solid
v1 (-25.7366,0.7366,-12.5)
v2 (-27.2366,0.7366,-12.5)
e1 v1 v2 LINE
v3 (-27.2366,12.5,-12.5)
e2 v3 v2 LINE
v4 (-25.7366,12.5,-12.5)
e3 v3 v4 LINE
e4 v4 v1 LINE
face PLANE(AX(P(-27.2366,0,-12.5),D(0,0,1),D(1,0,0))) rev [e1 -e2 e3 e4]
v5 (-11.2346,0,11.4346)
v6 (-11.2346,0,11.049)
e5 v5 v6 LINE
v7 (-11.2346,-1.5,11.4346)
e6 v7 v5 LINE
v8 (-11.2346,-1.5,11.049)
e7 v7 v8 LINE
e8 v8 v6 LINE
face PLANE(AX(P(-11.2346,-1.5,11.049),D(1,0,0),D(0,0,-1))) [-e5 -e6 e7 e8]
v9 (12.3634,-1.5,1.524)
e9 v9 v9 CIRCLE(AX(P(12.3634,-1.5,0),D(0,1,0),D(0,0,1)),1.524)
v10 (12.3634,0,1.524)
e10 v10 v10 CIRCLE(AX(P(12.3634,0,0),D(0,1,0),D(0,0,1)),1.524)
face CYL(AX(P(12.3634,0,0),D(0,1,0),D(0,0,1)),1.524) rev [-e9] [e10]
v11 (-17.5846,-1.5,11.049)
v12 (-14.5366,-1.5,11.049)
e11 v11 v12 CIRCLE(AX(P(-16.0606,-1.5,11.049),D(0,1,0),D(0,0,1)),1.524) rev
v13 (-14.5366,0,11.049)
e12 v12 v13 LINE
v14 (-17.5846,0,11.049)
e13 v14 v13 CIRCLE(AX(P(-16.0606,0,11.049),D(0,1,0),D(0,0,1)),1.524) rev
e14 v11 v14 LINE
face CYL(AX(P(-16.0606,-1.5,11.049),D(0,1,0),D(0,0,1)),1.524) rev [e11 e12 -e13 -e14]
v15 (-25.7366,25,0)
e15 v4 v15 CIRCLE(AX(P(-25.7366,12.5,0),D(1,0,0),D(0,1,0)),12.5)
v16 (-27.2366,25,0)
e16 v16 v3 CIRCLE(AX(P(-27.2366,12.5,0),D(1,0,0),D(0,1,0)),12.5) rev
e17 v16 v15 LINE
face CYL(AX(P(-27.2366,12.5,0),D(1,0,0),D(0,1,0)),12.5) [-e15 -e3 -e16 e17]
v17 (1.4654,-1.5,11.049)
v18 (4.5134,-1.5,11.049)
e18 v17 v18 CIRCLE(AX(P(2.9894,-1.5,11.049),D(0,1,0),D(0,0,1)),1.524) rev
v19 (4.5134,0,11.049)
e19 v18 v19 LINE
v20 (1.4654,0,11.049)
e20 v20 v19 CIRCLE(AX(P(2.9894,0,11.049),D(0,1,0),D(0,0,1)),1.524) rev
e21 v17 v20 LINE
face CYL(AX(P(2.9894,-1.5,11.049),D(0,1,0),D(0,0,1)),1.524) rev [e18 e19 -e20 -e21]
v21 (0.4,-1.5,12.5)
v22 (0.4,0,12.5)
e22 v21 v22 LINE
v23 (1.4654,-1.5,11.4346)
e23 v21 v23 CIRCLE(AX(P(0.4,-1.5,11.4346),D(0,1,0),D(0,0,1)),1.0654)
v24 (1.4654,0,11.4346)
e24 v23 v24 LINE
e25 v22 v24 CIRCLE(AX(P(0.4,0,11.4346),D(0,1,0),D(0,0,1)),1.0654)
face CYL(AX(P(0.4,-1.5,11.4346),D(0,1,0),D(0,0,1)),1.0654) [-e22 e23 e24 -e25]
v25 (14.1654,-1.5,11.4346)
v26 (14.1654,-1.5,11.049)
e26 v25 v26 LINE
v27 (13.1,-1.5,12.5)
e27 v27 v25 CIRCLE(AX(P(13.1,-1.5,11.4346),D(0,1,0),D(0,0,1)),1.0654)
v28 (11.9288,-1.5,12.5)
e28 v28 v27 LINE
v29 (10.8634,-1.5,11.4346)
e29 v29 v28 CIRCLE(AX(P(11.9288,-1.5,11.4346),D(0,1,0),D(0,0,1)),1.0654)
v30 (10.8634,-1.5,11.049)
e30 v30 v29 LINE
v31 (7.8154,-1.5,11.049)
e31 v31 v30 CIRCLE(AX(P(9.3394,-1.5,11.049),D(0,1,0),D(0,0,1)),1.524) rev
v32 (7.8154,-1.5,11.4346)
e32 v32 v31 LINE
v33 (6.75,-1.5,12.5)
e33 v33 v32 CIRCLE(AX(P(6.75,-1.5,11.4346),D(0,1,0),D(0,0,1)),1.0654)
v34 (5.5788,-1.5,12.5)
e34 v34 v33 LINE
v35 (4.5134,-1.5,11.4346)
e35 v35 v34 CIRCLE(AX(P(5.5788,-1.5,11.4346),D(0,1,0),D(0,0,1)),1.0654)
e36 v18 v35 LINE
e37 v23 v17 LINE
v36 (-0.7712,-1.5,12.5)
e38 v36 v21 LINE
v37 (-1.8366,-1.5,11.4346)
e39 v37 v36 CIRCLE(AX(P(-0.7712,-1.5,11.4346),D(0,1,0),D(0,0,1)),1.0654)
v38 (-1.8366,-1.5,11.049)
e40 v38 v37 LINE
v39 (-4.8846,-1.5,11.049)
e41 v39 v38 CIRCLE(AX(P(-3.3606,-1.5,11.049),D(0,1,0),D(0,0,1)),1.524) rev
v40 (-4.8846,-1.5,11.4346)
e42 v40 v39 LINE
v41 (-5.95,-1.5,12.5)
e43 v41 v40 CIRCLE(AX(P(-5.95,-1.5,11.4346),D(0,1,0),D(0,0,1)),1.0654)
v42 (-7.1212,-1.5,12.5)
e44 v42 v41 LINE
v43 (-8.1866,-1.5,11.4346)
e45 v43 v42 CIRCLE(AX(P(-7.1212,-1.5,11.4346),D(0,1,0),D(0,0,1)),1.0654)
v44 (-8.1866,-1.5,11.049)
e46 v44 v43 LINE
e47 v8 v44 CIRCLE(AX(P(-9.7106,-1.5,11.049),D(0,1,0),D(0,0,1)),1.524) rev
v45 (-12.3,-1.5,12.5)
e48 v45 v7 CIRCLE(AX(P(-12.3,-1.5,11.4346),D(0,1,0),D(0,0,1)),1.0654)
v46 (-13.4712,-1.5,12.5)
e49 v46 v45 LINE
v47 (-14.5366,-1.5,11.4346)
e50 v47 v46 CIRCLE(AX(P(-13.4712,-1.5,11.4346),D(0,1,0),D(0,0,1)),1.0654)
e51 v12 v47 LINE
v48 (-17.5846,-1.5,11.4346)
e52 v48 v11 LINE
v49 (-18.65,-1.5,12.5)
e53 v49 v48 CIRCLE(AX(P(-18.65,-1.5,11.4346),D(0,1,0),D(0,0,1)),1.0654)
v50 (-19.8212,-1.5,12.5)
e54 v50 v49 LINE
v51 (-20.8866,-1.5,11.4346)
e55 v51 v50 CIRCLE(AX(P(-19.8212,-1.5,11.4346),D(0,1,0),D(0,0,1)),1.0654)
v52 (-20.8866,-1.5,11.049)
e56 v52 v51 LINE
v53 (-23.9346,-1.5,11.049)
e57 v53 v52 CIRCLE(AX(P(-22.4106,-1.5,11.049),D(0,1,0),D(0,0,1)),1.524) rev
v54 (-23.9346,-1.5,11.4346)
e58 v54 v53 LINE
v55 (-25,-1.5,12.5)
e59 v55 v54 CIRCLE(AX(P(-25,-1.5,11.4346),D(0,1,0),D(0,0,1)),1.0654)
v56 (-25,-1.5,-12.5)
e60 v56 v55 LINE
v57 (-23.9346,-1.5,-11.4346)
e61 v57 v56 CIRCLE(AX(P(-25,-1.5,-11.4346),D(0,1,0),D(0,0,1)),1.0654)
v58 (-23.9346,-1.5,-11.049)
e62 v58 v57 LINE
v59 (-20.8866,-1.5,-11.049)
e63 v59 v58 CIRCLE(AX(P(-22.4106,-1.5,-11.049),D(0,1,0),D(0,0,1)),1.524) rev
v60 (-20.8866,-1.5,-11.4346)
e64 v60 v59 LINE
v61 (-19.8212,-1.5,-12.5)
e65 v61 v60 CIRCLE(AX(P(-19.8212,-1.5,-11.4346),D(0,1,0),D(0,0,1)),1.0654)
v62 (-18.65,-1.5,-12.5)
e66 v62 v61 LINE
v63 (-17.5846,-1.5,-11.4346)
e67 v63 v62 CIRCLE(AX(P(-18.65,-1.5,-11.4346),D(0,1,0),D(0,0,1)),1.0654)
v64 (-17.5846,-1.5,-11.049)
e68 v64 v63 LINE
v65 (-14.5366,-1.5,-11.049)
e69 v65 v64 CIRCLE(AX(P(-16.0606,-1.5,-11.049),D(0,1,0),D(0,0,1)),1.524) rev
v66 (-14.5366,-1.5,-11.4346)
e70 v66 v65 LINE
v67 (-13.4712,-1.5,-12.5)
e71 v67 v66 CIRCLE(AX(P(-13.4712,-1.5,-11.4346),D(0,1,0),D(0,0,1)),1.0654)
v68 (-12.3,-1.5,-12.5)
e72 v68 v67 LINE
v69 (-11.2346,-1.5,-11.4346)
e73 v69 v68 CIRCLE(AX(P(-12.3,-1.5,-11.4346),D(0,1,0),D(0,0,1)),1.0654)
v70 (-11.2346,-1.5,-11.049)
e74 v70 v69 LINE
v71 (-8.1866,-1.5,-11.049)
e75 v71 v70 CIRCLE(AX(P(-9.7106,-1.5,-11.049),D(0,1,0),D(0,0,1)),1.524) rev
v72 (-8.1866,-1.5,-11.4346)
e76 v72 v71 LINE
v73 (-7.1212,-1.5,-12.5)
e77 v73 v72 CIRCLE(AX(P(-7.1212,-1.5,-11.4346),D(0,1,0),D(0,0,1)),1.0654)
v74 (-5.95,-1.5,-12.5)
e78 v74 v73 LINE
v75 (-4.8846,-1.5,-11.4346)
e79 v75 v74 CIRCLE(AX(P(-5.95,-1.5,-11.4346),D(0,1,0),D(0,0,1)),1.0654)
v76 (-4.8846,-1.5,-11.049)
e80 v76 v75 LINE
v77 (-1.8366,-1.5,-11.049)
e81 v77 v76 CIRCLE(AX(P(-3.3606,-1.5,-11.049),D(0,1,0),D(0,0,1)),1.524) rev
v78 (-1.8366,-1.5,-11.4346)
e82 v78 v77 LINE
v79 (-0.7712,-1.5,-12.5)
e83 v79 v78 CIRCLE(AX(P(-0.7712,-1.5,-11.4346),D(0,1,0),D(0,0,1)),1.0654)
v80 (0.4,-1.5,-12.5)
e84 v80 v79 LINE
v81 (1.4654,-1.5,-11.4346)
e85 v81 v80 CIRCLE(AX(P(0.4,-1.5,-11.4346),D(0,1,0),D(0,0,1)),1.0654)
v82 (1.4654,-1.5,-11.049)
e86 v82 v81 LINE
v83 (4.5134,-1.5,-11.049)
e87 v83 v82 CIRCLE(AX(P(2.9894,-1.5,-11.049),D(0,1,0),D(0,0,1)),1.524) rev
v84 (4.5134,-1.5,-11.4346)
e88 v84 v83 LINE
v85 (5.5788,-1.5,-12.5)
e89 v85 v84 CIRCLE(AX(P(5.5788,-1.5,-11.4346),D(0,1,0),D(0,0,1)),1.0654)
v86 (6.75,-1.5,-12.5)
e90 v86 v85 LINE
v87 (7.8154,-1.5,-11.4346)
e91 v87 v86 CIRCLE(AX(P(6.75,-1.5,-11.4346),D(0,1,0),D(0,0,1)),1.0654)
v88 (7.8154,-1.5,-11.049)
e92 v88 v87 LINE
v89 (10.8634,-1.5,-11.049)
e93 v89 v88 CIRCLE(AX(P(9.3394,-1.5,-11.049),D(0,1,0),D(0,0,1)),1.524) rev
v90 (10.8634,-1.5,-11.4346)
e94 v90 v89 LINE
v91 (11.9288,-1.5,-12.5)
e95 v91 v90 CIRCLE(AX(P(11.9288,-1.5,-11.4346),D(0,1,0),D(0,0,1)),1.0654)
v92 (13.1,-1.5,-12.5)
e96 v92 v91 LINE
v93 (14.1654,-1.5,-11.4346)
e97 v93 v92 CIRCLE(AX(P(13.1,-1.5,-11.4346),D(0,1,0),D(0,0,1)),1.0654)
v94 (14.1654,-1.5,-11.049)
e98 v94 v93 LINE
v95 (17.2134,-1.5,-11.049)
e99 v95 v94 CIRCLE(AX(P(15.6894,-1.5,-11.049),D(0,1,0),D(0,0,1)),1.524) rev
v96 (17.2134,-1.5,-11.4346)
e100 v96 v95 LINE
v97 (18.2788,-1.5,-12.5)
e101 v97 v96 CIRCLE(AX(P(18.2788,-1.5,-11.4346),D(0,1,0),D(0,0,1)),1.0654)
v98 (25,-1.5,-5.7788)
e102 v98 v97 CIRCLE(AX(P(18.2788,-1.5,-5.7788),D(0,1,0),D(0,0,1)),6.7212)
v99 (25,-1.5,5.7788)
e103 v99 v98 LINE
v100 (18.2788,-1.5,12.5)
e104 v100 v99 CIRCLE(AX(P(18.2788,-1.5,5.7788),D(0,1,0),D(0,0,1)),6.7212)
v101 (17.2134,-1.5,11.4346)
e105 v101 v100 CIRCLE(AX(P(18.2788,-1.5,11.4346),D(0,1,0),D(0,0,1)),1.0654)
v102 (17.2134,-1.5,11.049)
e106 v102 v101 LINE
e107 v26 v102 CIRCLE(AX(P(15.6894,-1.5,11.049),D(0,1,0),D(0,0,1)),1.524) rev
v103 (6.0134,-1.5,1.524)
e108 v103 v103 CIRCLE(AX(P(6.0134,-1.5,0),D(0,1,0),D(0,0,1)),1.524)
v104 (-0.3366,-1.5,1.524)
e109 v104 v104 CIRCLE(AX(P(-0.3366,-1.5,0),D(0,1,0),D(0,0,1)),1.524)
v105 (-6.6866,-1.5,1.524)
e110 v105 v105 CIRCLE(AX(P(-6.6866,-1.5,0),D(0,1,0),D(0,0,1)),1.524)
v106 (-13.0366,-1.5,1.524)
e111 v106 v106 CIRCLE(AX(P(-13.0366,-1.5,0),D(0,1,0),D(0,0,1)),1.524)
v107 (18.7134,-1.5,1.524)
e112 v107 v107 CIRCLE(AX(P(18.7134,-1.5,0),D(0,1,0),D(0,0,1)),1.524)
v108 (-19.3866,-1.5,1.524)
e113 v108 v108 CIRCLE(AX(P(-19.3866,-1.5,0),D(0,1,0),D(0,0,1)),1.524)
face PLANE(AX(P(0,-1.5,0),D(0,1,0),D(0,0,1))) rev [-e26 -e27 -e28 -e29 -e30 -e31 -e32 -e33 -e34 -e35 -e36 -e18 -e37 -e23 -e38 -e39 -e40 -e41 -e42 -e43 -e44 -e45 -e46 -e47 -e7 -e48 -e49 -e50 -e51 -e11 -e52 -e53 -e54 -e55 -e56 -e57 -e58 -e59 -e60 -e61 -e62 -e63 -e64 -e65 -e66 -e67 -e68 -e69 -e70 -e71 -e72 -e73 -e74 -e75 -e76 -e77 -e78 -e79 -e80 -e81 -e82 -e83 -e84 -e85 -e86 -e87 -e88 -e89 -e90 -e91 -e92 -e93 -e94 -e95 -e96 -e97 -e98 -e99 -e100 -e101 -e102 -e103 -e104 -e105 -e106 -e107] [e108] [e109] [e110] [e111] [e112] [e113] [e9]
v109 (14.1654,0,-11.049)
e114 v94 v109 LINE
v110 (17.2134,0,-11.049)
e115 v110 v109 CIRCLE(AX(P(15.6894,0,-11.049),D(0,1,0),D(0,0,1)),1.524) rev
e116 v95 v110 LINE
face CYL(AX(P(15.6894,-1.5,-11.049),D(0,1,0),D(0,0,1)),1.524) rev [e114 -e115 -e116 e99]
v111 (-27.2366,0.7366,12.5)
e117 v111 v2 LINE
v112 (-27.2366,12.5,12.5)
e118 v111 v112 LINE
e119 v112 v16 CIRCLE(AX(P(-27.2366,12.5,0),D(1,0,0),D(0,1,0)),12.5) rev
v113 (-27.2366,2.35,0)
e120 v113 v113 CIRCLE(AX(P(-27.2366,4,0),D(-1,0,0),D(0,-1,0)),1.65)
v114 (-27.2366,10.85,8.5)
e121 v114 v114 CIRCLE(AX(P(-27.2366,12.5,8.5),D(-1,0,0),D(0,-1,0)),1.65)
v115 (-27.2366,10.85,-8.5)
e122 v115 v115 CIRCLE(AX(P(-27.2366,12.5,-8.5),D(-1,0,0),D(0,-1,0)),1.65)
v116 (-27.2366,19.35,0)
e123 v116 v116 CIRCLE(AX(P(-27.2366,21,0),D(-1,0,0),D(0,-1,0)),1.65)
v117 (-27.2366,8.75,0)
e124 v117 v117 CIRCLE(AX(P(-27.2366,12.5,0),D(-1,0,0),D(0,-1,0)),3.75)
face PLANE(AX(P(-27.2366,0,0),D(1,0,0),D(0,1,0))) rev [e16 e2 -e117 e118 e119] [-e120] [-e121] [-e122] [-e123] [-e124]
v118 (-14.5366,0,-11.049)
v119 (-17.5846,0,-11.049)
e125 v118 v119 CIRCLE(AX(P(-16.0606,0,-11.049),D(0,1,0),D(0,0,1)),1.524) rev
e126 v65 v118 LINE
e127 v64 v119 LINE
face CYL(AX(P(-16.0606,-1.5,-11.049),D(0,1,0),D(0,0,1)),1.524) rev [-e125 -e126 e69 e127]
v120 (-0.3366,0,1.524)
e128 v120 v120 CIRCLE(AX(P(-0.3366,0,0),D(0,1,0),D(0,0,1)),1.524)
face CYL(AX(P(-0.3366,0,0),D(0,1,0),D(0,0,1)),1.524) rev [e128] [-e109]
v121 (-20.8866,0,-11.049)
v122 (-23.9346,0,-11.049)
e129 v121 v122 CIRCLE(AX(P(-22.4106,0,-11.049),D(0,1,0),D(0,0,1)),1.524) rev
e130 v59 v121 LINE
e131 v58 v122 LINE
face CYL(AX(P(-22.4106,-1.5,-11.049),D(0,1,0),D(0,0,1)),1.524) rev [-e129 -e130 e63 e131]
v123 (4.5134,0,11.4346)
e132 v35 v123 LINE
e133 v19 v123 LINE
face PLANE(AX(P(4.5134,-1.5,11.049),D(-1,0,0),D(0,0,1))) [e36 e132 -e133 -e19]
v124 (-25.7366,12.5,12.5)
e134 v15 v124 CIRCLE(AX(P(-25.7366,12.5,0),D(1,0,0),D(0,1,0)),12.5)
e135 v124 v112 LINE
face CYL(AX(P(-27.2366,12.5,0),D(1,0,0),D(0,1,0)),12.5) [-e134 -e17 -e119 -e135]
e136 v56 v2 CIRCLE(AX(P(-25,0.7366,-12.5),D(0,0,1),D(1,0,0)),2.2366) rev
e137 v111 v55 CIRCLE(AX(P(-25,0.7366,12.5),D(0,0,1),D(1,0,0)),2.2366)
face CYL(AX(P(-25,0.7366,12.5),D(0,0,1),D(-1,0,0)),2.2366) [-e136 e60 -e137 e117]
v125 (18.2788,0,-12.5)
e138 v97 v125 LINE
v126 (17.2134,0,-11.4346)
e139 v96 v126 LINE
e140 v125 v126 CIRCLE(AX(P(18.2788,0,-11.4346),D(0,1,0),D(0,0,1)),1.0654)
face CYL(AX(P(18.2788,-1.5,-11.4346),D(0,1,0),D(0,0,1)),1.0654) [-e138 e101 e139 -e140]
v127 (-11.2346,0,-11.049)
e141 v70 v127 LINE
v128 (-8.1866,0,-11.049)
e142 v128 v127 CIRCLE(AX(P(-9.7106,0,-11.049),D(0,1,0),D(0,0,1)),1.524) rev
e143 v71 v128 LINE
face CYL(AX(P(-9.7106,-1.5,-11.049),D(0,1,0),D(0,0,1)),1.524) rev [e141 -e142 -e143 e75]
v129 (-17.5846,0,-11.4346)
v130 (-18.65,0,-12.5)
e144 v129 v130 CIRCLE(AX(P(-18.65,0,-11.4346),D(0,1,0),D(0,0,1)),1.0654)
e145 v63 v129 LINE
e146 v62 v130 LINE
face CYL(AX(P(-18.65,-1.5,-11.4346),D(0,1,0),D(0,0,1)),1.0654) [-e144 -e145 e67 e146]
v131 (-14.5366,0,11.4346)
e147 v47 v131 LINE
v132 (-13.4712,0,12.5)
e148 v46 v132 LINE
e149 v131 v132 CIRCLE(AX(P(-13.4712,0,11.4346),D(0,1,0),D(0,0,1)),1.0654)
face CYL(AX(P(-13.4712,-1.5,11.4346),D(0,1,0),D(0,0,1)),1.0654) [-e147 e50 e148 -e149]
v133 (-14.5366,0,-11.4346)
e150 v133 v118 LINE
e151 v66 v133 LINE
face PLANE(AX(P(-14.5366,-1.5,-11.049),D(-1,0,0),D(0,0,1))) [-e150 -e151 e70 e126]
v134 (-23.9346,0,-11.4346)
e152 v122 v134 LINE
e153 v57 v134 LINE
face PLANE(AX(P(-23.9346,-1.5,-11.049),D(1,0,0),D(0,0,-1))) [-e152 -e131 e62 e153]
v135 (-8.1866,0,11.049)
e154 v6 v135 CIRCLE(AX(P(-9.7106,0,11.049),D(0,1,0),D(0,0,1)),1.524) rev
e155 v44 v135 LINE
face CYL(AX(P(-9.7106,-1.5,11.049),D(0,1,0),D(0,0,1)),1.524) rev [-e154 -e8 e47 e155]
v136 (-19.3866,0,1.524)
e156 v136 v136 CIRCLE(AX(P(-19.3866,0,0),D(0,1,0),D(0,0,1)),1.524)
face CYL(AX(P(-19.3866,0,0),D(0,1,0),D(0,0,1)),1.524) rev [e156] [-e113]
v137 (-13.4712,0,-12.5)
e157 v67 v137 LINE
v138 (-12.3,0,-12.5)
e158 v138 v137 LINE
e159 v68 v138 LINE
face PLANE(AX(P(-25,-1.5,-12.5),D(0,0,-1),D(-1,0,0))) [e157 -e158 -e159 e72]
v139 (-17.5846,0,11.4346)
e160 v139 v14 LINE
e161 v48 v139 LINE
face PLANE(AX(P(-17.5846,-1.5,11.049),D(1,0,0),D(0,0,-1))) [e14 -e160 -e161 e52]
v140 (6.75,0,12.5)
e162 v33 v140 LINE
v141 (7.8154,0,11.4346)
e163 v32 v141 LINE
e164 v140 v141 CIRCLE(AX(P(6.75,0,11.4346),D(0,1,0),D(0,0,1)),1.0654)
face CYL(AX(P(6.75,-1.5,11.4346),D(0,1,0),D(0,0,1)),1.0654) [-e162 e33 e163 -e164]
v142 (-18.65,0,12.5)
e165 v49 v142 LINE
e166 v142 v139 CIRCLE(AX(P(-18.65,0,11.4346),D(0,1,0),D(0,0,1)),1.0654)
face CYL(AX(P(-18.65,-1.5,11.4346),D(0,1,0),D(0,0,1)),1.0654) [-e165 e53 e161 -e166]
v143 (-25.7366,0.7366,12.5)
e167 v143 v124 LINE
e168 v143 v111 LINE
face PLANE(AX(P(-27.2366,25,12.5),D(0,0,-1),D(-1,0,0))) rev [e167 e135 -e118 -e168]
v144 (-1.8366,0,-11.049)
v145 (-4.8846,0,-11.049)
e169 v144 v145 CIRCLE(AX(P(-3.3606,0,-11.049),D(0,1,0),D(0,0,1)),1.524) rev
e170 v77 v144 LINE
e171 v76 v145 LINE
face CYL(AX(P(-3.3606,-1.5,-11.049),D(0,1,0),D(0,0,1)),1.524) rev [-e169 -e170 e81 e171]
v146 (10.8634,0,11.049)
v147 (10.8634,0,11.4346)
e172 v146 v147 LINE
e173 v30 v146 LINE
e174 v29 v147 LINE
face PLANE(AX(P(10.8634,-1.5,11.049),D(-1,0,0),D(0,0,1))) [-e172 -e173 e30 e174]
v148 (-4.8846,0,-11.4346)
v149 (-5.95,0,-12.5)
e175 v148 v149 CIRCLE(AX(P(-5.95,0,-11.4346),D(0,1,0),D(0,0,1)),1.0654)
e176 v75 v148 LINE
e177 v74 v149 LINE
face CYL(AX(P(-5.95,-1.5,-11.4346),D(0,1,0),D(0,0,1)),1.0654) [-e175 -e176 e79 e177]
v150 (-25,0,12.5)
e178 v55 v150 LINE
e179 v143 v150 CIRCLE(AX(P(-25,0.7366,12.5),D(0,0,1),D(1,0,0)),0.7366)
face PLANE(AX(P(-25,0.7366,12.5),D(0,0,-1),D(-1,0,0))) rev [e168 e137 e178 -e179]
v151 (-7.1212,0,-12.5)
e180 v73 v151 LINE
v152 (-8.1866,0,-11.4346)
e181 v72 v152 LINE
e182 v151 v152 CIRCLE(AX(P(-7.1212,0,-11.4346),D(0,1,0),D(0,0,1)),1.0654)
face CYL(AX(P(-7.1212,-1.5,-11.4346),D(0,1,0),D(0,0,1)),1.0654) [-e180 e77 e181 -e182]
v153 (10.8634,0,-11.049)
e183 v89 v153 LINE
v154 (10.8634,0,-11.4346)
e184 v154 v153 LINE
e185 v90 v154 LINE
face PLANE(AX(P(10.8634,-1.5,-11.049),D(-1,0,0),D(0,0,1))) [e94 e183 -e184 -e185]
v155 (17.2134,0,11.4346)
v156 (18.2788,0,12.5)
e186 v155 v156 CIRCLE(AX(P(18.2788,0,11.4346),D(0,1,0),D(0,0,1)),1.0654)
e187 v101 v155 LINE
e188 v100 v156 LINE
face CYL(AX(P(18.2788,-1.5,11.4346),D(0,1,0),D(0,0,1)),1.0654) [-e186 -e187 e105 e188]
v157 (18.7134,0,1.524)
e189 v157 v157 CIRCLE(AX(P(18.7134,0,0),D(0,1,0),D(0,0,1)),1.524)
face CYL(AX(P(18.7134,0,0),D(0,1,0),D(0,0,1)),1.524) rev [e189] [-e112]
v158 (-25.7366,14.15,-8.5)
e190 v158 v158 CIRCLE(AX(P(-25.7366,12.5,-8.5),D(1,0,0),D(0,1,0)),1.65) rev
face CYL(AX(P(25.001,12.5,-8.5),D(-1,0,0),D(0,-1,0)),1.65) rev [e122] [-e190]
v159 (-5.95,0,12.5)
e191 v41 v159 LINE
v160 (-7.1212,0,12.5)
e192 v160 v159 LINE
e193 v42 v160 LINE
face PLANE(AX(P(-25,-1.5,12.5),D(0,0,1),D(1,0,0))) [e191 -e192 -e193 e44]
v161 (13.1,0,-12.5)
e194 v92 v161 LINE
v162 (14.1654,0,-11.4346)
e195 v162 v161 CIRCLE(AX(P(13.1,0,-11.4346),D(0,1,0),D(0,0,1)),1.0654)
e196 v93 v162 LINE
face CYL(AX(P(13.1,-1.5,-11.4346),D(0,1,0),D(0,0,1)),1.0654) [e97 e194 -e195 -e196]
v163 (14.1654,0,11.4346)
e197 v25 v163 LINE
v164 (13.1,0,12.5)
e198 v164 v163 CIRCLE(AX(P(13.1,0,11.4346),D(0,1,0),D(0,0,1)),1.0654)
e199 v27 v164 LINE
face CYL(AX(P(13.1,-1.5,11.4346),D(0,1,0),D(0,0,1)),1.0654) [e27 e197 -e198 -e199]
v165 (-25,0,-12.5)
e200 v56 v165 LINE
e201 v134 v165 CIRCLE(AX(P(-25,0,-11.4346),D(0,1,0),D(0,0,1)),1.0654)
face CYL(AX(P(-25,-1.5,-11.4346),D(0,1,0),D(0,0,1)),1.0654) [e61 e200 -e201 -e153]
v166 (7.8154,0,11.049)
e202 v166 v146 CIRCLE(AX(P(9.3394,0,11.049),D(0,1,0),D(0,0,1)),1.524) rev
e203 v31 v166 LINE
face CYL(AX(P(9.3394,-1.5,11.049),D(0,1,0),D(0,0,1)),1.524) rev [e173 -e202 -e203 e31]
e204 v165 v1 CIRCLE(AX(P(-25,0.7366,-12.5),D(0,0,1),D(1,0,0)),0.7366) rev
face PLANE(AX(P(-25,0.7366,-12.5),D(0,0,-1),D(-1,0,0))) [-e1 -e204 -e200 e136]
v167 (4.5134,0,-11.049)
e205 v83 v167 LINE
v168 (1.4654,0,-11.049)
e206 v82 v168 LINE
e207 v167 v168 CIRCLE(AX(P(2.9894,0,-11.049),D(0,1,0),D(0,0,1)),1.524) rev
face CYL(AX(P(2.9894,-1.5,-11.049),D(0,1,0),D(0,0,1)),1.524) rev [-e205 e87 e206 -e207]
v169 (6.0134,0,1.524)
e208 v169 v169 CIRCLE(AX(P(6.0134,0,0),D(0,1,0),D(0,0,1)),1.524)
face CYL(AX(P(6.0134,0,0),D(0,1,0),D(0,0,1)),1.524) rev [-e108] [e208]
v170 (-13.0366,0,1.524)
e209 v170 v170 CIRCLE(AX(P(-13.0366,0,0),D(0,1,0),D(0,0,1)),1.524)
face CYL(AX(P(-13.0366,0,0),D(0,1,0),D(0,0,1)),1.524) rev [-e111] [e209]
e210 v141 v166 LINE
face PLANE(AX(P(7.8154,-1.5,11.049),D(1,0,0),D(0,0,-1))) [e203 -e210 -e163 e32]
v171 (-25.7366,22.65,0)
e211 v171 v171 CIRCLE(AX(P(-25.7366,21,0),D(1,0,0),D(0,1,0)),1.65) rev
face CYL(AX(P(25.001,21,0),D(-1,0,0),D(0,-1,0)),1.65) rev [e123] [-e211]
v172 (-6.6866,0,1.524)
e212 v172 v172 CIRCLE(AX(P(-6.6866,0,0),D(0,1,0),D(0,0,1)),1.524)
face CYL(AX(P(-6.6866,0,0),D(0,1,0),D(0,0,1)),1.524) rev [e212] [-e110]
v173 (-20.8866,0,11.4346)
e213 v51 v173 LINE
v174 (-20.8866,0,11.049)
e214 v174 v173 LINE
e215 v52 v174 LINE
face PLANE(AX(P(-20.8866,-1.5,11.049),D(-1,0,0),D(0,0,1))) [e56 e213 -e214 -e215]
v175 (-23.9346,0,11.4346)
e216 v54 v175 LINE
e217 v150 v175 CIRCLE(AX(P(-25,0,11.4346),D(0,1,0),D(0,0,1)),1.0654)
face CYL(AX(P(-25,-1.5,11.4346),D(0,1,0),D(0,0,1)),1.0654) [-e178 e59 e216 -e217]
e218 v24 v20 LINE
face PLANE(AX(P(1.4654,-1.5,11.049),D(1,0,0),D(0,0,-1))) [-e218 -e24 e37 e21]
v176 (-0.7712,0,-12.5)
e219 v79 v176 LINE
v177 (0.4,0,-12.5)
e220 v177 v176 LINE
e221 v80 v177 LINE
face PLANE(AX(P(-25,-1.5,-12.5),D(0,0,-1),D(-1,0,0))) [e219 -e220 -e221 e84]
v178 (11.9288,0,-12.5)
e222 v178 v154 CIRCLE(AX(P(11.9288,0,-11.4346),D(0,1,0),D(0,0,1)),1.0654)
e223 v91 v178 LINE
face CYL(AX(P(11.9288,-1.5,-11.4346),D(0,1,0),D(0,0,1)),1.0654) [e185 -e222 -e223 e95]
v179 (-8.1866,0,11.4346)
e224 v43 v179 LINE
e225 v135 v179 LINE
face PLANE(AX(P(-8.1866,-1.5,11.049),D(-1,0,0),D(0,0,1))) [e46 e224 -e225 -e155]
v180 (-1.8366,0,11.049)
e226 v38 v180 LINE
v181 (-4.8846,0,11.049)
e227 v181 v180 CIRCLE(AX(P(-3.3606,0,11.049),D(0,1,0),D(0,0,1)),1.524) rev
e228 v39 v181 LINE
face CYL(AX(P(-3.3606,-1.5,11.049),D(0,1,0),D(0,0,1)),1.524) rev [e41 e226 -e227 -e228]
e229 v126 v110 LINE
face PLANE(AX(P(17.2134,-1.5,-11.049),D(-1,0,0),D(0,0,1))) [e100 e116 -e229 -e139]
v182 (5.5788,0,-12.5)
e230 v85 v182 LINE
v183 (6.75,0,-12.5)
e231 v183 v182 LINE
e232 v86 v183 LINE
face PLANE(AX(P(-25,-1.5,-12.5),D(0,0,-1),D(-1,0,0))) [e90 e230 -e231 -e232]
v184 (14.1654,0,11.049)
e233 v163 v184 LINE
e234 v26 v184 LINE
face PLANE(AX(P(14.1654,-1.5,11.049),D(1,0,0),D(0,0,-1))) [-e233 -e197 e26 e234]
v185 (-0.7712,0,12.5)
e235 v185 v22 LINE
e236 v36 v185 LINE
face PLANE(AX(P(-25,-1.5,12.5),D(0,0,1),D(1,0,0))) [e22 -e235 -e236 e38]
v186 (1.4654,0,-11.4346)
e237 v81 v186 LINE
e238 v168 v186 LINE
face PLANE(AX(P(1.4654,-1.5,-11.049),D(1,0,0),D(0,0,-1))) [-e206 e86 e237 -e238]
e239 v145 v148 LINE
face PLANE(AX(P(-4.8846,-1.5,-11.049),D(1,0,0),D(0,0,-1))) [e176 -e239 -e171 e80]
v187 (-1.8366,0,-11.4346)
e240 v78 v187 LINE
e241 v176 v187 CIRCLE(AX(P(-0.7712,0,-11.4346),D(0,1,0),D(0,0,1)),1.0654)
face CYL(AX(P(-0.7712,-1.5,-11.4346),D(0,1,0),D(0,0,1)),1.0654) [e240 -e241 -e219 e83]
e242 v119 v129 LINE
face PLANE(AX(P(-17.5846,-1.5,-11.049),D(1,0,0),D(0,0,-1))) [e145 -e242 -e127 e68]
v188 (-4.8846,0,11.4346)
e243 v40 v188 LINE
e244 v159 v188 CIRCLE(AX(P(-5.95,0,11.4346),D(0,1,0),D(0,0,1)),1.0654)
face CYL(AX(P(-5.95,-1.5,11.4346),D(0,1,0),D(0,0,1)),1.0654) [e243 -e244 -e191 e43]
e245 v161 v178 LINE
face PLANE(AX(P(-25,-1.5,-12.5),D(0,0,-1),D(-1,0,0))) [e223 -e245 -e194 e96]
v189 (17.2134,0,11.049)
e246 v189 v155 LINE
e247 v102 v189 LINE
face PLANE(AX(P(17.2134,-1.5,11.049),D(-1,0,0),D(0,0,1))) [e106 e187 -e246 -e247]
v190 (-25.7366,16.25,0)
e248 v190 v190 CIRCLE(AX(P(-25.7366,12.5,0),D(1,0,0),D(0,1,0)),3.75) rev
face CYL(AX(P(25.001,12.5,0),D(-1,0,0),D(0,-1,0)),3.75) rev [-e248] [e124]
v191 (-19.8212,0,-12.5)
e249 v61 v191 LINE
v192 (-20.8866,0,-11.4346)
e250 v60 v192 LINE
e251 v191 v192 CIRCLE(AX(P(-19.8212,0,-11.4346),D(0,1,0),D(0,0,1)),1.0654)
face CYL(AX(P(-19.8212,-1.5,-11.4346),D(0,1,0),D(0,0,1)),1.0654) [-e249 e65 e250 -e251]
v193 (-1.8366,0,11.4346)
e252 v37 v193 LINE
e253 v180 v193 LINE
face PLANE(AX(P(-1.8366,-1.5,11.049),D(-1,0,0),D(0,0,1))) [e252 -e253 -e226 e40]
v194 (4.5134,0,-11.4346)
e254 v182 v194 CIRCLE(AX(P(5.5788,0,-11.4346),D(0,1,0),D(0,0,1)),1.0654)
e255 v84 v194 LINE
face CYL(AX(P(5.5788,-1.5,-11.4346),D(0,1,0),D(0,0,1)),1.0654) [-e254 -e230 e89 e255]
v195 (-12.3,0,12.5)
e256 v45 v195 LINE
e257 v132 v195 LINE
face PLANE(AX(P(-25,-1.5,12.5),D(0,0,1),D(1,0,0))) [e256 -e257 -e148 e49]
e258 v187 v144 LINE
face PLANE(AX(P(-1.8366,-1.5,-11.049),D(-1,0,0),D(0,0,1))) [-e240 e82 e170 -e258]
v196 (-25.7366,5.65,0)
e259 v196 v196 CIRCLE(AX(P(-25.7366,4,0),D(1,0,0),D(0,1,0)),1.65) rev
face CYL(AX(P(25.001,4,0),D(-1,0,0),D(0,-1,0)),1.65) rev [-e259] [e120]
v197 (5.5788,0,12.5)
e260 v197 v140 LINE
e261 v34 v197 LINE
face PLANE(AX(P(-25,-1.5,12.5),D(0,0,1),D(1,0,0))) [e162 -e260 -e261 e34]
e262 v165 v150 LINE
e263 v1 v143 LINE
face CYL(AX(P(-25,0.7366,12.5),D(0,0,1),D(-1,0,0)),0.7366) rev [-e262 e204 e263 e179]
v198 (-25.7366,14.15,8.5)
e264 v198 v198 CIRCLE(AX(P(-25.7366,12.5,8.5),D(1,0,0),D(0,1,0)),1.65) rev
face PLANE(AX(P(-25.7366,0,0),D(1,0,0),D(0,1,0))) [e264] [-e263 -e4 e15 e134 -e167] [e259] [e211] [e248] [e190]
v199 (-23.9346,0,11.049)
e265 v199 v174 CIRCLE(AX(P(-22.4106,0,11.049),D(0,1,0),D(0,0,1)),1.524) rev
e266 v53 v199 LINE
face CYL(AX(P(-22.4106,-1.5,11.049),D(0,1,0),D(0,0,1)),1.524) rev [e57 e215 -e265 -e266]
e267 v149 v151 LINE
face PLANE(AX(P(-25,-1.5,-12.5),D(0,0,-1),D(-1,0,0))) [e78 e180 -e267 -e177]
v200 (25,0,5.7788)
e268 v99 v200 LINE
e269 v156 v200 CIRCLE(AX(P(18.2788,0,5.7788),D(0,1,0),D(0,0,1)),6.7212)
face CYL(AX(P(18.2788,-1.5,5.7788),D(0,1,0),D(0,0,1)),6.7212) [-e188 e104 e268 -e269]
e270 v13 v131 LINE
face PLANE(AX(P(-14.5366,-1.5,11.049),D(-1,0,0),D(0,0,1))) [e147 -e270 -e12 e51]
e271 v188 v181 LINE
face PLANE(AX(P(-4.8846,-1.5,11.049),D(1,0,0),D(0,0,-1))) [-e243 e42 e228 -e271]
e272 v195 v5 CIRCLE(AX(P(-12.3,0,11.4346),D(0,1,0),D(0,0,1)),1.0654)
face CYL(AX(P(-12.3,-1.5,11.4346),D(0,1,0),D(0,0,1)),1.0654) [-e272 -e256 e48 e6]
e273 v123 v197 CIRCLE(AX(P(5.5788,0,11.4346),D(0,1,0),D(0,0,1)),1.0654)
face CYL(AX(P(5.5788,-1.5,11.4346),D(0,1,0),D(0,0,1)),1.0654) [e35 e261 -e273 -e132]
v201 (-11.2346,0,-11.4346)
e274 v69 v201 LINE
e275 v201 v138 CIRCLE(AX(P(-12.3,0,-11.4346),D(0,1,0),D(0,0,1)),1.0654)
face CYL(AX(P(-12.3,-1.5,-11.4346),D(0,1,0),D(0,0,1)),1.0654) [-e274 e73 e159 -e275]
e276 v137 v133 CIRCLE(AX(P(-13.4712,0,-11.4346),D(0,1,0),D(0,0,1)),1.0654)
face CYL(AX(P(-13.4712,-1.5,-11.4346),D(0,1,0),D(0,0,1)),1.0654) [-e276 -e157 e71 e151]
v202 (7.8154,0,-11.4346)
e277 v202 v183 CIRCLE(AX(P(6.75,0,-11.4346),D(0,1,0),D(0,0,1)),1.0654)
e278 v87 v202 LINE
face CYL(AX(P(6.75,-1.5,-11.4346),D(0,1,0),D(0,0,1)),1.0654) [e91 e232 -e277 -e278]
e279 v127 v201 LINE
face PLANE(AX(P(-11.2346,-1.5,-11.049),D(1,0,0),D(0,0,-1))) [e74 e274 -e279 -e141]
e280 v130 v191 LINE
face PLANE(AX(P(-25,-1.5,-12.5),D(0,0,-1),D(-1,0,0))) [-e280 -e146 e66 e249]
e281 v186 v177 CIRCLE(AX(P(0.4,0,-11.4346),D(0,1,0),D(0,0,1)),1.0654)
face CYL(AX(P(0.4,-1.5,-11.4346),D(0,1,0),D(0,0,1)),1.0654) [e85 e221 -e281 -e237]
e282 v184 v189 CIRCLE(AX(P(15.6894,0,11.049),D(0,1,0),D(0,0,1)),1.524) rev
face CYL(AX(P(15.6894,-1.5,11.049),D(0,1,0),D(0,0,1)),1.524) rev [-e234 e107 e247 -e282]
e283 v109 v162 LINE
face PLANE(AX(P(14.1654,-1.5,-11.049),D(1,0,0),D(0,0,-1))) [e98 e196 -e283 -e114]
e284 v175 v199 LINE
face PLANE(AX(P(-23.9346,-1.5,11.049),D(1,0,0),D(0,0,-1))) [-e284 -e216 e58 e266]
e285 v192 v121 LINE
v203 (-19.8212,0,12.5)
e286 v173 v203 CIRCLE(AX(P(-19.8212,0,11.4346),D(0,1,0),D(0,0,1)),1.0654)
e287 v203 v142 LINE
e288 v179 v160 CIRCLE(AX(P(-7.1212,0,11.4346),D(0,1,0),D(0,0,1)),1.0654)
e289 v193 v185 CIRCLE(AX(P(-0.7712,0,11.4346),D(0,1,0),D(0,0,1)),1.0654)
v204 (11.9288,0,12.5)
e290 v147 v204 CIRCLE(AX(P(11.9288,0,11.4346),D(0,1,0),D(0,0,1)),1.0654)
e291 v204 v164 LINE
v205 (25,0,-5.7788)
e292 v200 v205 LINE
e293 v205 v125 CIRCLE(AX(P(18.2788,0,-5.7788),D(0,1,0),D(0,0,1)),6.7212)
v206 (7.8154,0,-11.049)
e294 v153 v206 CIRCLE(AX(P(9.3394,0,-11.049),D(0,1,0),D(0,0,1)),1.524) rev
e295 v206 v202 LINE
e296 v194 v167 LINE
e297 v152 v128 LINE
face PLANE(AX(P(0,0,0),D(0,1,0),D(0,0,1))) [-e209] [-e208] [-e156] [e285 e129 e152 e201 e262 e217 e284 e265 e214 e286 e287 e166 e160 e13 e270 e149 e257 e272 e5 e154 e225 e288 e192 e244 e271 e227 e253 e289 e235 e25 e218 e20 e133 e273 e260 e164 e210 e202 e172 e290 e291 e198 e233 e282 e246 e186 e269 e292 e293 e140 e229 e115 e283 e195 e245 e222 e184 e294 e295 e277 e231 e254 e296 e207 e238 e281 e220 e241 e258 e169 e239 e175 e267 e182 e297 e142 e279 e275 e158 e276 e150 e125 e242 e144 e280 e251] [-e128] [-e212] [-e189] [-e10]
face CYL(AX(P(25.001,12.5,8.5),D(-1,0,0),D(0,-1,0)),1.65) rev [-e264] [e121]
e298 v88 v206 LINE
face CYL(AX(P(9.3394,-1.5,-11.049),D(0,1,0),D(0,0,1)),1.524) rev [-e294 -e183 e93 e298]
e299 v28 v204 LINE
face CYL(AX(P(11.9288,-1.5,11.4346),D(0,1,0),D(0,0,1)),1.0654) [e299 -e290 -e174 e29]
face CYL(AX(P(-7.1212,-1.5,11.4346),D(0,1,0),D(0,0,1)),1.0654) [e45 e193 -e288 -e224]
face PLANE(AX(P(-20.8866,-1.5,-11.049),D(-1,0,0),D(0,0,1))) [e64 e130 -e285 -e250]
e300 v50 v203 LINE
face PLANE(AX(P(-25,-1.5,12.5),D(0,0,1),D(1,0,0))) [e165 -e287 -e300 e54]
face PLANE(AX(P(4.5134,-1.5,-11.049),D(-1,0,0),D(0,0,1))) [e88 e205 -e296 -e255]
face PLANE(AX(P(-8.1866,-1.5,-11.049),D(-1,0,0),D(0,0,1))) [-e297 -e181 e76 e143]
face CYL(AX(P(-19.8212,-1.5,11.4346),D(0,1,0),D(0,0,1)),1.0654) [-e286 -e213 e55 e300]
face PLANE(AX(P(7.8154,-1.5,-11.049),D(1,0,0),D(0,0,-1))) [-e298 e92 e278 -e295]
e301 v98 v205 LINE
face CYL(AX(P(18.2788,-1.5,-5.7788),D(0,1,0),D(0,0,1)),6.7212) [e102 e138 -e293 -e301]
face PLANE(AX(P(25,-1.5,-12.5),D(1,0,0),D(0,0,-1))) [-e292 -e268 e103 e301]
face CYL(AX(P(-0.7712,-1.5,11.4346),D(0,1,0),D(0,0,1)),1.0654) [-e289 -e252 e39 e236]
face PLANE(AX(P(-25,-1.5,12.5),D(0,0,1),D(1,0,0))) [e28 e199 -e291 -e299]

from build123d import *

# Parameters (mm, degrees)
SKETCH1_W          = 50
SKETCH1_H          = 25
BASE_FLANGE1_DEPTH = 1.5
EDGE_FLANGE1_DEPTH = 25
FILLET1_R          = 12.5
CUT_EXTRUDE1_REACH = 61.245
SKETCH11_R         = 3.75
SKETCH11_R_2       = 1.65
CUT_EXTRUDE2_START = -1.5
SKETCH14_R         = 1.524
CUT_EXTRUDE2_DEPTH = 26.5


# Sheet-metal steps are written as plain solids
with BuildPart() as part:
    # Sketch1 → Base-Flange1 (new body)
    with BuildSketch(Plane(origin=(0, 0, 0), x_dir=(1, 0, 0), z_dir=(0, 1, 0))):
        Rectangle(SKETCH1_W, SKETCH1_H)
    extrude(amount=-BASE_FLANGE1_DEPTH)

    # Edge-Flange1 section (across the edge) → Edge-Flange1 (add)
    with BuildSketch(Plane(origin=(-25.7366, 0, -12.5), x_dir=(1, 0, 0), z_dir=(0, 0, 1))):
        with BuildLine():
            Line((-1.5, 0.7366), (-1.5, 25))
            Line((-1.5, 25), (0, 25))
            Line((0, 25), (0, 0.7366))
            ThreePointArc((0, 0.7366), (0.215745145, 0.215745145), (0.7366, 0))
            Line((0.7366, 0), (0.7366, -1.5))
            ThreePointArc((0.7366, -1.5), (-0.844915027, -0.844915027), (-1.5, 0.7366))
        make_face()
    extrude(amount=EDGE_FLANGE1_DEPTH)

    # Fillet1
    fillet1_edges = [part.edges().sort_by_distance(p)[0] for p in [
        (-26.4866, 25, -12.5),
        (-26.4866, 25, 12.5),
    ]]
    fillet(fillet1_edges, radius=FILLET1_R - 0.0001)  # a hair under: the kernel refuses the full size

    # Sketch11 → Cut-Extrude1 (cut, up to next)
    with BuildSketch(Plane.ZY.offset(27.2366), mode=Mode.PRIVATE) as cut_extrude1_sk1:
        with Locations(Location((0, 12.5, 0), (0, 0, 270))):
            Circle(SKETCH11_R)
    cut_extrude1_tool1 = extrude(cut_extrude1_sk1.sketch, amount=-CUT_EXTRUDE1_REACH, mode=Mode.PRIVATE) & part.part
    # Sketch11 → Cut-Extrude1 (cut, up to next)
    with BuildSketch(Plane.ZY.offset(27.2366), mode=Mode.PRIVATE) as cut_extrude1_sk2:
        with Locations(Location((0, 21, 0), (0, 0, 270))):
            Circle(SKETCH11_R_2)
    cut_extrude1_tool2 = extrude(cut_extrude1_sk2.sketch, amount=-CUT_EXTRUDE1_REACH, mode=Mode.PRIVATE) & part.part
    # Sketch11 → Cut-Extrude1 (cut, up to next)
    with BuildSketch(Plane.ZY.offset(27.2366), mode=Mode.PRIVATE) as cut_extrude1_sk3:
        with Locations(Location((8.5, 12.5, 0), (0, 0, 270))):
            Circle(SKETCH11_R_2)
    cut_extrude1_tool3 = extrude(cut_extrude1_sk3.sketch, amount=-CUT_EXTRUDE1_REACH, mode=Mode.PRIVATE) & part.part
    # Sketch11 → Cut-Extrude1 (cut, up to next)
    with BuildSketch(Plane.ZY.offset(27.2366), mode=Mode.PRIVATE) as cut_extrude1_sk4:
        with Locations(Location((0, 4, 0), (0, 0, 270))):
            Circle(SKETCH11_R_2)
    cut_extrude1_tool4 = extrude(cut_extrude1_sk4.sketch, amount=-CUT_EXTRUDE1_REACH, mode=Mode.PRIVATE) & part.part
    # Sketch11 → Cut-Extrude1 (cut, up to next)
    with BuildSketch(Plane.ZY.offset(27.2366), mode=Mode.PRIVATE) as cut_extrude1_sk5:
        with Locations(Location((-8.5, 12.5, 0), (0, 0, 270))):
            Circle(SKETCH11_R_2)
    cut_extrude1_tool5 = extrude(cut_extrude1_sk5.sketch, amount=-CUT_EXTRUDE1_REACH, mode=Mode.PRIVATE) & part.part
    add(cut_extrude1_tool1.solids().sort_by_distance((-27.2366, 12.5, 0))[0], mode=Mode.SUBTRACT)
    add(cut_extrude1_tool2.solids().sort_by_distance((-27.2366, 21, 0))[0], mode=Mode.SUBTRACT)
    add(cut_extrude1_tool3.solids().sort_by_distance((-27.2366, 12.5, 8.5))[0], mode=Mode.SUBTRACT)
    add(cut_extrude1_tool4.solids().sort_by_distance((-27.2366, 4, 0))[0], mode=Mode.SUBTRACT)
    add(cut_extrude1_tool5.solids().sort_by_distance((-27.2366, 12.5, -8.5))[0], mode=Mode.SUBTRACT)

    # Sketch14 → Cut-Extrude2 (cut)
    with BuildSketch(Plane(origin=(0, 0, 0), x_dir=(1, 0, 0), z_dir=(0, 1, 0)).offset(CUT_EXTRUDE2_START)):
        with Locations(Location((-19.3866, 0, 0), (0, 0, 270))):
            Circle(SKETCH14_R)
        with Locations(Location((-13.0366, 0, 0), (0, 0, 270))):
            Circle(SKETCH14_R)
        with Locations(Location((-6.6866, 0, 0), (0, 0, 270))):
            Circle(SKETCH14_R)
        with Locations(Location((-0.3366, 0, 0), (0, 0, 270))):
            Circle(SKETCH14_R)
        with Locations(Location((6.0134, 0, 0), (0, 0, 270))):
            Circle(SKETCH14_R)
        with Locations(Location((12.3634, 0, 0), (0, 0, 270))):
            Circle(SKETCH14_R)
        with Locations(Location((18.7134, 0, 0), (0, 0, 270))):
            Circle(SKETCH14_R)
        with BuildLine():
            Line((-20.8866, 11.049), (-20.8866, 11.4346))
            ThreePointArc((-20.8866, 11.4346), (-20.574551565, 12.187951565), (-19.8212, 12.5))
            Line((-19.8212, 12.5), (-18.65, 12.5))
            ThreePointArc((-18.65, 12.5), (-17.896648435, 12.187951565), (-17.5846, 11.4346))
            Line((-17.5846, 11.4346), (-17.5846, 11.049))
            ThreePointArc((-17.5846, 11.049), (-16.0606, 9.525), (-14.5366, 11.049))
            Line((-14.5366, 11.049), (-14.5366, 11.4346))
            ThreePointArc((-14.5366, 11.4346), (-14.224551565, 12.187951565), (-13.4712, 12.5))
            Line((-13.4712, 12.5), (-12.3, 12.5))
            ThreePointArc((-12.3, 12.5), (-11.546648435, 12.187951565), (-11.2346, 11.4346))
            Line((-11.2346, 11.4346), (-11.2346, 11.049))
            ThreePointArc((-11.2346, 11.049), (-9.7106, 9.525), (-8.1866, 11.049))
            Line((-8.1866, 11.049), (-8.1866, 11.4346))
            ThreePointArc((-8.1866, 11.4346), (-7.874551565, 12.187951565), (-7.1212, 12.5))
            Line((-7.1212, 12.5), (-5.95, 12.5))
            ThreePointArc((-5.95, 12.5), (-5.196648435, 12.187951565), (-4.8846, 11.4346))
            Line((-4.8846, 11.4346), (-4.8846, 11.049))
            ThreePointArc((-4.8846, 11.049), (-3.3606, 9.525), (-1.8366, 11.049))
            Line((-1.8366, 11.049), (-1.8366, 11.4346))
            ThreePointArc((-1.8366, 11.4346), (-1.524551565, 12.187951565), (-0.7712, 12.5))
            Line((-0.7712, 12.5), (0.4, 12.5))
            ThreePointArc((0.4, 12.5), (1.153351565, 12.187951565), (1.4654, 11.4346))
            Line((1.4654, 11.4346), (1.4654, 11.049))
            ThreePointArc((1.4654, 11.049), (2.9894, 9.525), (4.5134, 11.049))
            Line((4.5134, 11.049), (4.5134, 11.4346))
            ThreePointArc((4.5134, 11.4346), (4.825448435, 12.187951565), (5.5788, 12.5))
            Line((5.5788, 12.5), (6.75, 12.5))
            ThreePointArc((6.75, 12.5), (7.503351565, 12.187951565), (7.8154, 11.4346))
            Line((7.8154, 11.4346), (7.8154, 11.049))
            ThreePointArc((7.8154, 11.049), (9.3394, 9.525), (10.8634, 11.049))
            Line((10.8634, 11.049), (10.8634, 11.4346))
            ThreePointArc((10.8634, 11.4346), (11.175448435, 12.187951565), (11.9288, 12.5))
            Line((11.9288, 12.5), (13.1, 12.5))
            ThreePointArc((13.1, 12.5), (13.853351565, 12.187951565), (14.1654, 11.4346))
            Line((14.1654, 11.4346), (14.1654, 11.049))
            ThreePointArc((14.1654, 11.049), (15.6894, 9.525), (17.2134, 11.049))
            Line((17.2134, 11.049), (17.2134, 11.4346))
            ThreePointArc((17.2134, 11.4346), (17.525448435, 12.187951565), (18.2788, 12.5))
            ThreePointArc((18.2788, 12.5), (23.031406098, 10.531406098), (25, 5.7788))
            Line((25, 5.7788), (25, 3.086206539))
            Line((25, 3.086206539), (30.090944924, 3.086206539))
            Line((30.090944924, 3.086206539), (30.090944924, 14.304286601))
            Line((30.090944924, 14.304286601), (18.2788, 14.304286601))
            Line((18.2788, 14.304286601), (-25, 14.304286601))
            Line((-25, 14.304286601), (-25, 12.5))
            ThreePointArc((-25, 12.5), (-24.246648435, 12.187951565), (-23.9346, 11.4346))
            Line((-23.9346, 11.4346), (-23.9346, 11.049))
            ThreePointArc((-23.9346, 11.049), (-22.4106, 9.525), (-20.8866, 11.049))
        make_face()
        with BuildLine():
            Line((30.090944924, -14.304286601), (18.2788, -14.304286601))
            Line((18.2788, -14.304286601), (-25, -14.304286601))
            Line((-25, -14.304286601), (-25, -12.5))
            ThreePointArc((-25, -12.5), (-24.246648435, -12.187951565), (-23.9346, -11.4346))
            Line((-23.9346, -11.4346), (-23.9346, -11.049))
            ThreePointArc((-23.9346, -11.049), (-22.4106, -9.525), (-20.8866, -11.049))
            Line((-20.8866, -11.049), (-20.8866, -11.4346))
            ThreePointArc((-20.8866, -11.4346), (-20.574551565, -12.187951565), (-19.8212, -12.5))
            Line((-19.8212, -12.5), (-18.65, -12.5))
            ThreePointArc((-18.65, -12.5), (-17.896648435, -12.187951565), (-17.5846, -11.4346))
            Line((-17.5846, -11.4346), (-17.5846, -11.049))
            ThreePointArc((-17.5846, -11.049), (-16.0606, -9.525), (-14.5366, -11.049))
            Line((-14.5366, -11.049), (-14.5366, -11.4346))
            ThreePointArc((-14.5366, -11.4346), (-14.224551565, -12.187951565), (-13.4712, -12.5))
            Line((-13.4712, -12.5), (-12.3, -12.5))
            ThreePointArc((-12.3, -12.5), (-11.546648435, -12.187951565), (-11.2346, -11.4346))
            Line((-11.2346, -11.4346), (-11.2346, -11.049))
            ThreePointArc((-11.2346, -11.049), (-9.7106, -9.525), (-8.1866, -11.049))
            Line((-8.1866, -11.049), (-8.1866, -11.4346))
            ThreePointArc((-8.1866, -11.4346), (-7.874551565, -12.187951565), (-7.1212, -12.5))
            Line((-7.1212, -12.5), (-5.95, -12.5))
            ThreePointArc((-5.95, -12.5), (-5.196648435, -12.187951565), (-4.8846, -11.4346))
            Line((-4.8846, -11.4346), (-4.8846, -11.049))
            ThreePointArc((-4.8846, -11.049), (-3.3606, -9.525), (-1.8366, -11.049))
            Line((-1.8366, -11.049), (-1.8366, -11.4346))
            ThreePointArc((-1.8366, -11.4346), (-1.524551565, -12.187951565), (-0.7712, -12.5))
            Line((-0.7712, -12.5), (0.4, -12.5))
            ThreePointArc((0.4, -12.5), (1.153351565, -12.187951565), (1.4654, -11.4346))
            Line((1.4654, -11.4346), (1.4654, -11.049))
            ThreePointArc((1.4654, -11.049), (2.9894, -9.525), (4.5134, -11.049))
            Line((4.5134, -11.049), (4.5134, -11.4346))
            ThreePointArc((4.5134, -11.4346), (4.825448435, -12.187951565), (5.5788, -12.5))
            Line((5.5788, -12.5), (6.75, -12.5))
            ThreePointArc((6.75, -12.5), (7.503351565, -12.187951565), (7.8154, -11.4346))
            Line((7.8154, -11.4346), (7.8154, -11.049))
            ThreePointArc((7.8154, -11.049), (9.3394, -9.525), (10.8634, -11.049))
            Line((10.8634, -11.049), (10.8634, -11.4346))
            ThreePointArc((10.8634, -11.4346), (11.175448435, -12.187951565), (11.9288, -12.5))
            Line((11.9288, -12.5), (13.1, -12.5))
            ThreePointArc((13.1, -12.5), (13.853351565, -12.187951565), (14.1654, -11.4346))
            Line((14.1654, -11.4346), (14.1654, -11.049))
            ThreePointArc((14.1654, -11.049), (15.6894, -9.525), (17.2134, -11.049))
            Line((17.2134, -11.049), (17.2134, -11.4346))
            ThreePointArc((17.2134, -11.4346), (17.525448435, -12.187951565), (18.2788, -12.5))
            ThreePointArc((18.2788, -12.5), (23.031406098, -10.531406098), (25, -5.7788))
            Line((25, -5.7788), (25, -3.086206539))
            Line((25, -3.086206539), (30.090944924, -3.086206539))
            Line((30.090944924, -3.086206539), (30.090944924, -14.304286601))
        make_face()
    extrude(amount=CUT_EXTRUDE2_DEPTH, mode=Mode.SUBTRACT)


solid = part.part
